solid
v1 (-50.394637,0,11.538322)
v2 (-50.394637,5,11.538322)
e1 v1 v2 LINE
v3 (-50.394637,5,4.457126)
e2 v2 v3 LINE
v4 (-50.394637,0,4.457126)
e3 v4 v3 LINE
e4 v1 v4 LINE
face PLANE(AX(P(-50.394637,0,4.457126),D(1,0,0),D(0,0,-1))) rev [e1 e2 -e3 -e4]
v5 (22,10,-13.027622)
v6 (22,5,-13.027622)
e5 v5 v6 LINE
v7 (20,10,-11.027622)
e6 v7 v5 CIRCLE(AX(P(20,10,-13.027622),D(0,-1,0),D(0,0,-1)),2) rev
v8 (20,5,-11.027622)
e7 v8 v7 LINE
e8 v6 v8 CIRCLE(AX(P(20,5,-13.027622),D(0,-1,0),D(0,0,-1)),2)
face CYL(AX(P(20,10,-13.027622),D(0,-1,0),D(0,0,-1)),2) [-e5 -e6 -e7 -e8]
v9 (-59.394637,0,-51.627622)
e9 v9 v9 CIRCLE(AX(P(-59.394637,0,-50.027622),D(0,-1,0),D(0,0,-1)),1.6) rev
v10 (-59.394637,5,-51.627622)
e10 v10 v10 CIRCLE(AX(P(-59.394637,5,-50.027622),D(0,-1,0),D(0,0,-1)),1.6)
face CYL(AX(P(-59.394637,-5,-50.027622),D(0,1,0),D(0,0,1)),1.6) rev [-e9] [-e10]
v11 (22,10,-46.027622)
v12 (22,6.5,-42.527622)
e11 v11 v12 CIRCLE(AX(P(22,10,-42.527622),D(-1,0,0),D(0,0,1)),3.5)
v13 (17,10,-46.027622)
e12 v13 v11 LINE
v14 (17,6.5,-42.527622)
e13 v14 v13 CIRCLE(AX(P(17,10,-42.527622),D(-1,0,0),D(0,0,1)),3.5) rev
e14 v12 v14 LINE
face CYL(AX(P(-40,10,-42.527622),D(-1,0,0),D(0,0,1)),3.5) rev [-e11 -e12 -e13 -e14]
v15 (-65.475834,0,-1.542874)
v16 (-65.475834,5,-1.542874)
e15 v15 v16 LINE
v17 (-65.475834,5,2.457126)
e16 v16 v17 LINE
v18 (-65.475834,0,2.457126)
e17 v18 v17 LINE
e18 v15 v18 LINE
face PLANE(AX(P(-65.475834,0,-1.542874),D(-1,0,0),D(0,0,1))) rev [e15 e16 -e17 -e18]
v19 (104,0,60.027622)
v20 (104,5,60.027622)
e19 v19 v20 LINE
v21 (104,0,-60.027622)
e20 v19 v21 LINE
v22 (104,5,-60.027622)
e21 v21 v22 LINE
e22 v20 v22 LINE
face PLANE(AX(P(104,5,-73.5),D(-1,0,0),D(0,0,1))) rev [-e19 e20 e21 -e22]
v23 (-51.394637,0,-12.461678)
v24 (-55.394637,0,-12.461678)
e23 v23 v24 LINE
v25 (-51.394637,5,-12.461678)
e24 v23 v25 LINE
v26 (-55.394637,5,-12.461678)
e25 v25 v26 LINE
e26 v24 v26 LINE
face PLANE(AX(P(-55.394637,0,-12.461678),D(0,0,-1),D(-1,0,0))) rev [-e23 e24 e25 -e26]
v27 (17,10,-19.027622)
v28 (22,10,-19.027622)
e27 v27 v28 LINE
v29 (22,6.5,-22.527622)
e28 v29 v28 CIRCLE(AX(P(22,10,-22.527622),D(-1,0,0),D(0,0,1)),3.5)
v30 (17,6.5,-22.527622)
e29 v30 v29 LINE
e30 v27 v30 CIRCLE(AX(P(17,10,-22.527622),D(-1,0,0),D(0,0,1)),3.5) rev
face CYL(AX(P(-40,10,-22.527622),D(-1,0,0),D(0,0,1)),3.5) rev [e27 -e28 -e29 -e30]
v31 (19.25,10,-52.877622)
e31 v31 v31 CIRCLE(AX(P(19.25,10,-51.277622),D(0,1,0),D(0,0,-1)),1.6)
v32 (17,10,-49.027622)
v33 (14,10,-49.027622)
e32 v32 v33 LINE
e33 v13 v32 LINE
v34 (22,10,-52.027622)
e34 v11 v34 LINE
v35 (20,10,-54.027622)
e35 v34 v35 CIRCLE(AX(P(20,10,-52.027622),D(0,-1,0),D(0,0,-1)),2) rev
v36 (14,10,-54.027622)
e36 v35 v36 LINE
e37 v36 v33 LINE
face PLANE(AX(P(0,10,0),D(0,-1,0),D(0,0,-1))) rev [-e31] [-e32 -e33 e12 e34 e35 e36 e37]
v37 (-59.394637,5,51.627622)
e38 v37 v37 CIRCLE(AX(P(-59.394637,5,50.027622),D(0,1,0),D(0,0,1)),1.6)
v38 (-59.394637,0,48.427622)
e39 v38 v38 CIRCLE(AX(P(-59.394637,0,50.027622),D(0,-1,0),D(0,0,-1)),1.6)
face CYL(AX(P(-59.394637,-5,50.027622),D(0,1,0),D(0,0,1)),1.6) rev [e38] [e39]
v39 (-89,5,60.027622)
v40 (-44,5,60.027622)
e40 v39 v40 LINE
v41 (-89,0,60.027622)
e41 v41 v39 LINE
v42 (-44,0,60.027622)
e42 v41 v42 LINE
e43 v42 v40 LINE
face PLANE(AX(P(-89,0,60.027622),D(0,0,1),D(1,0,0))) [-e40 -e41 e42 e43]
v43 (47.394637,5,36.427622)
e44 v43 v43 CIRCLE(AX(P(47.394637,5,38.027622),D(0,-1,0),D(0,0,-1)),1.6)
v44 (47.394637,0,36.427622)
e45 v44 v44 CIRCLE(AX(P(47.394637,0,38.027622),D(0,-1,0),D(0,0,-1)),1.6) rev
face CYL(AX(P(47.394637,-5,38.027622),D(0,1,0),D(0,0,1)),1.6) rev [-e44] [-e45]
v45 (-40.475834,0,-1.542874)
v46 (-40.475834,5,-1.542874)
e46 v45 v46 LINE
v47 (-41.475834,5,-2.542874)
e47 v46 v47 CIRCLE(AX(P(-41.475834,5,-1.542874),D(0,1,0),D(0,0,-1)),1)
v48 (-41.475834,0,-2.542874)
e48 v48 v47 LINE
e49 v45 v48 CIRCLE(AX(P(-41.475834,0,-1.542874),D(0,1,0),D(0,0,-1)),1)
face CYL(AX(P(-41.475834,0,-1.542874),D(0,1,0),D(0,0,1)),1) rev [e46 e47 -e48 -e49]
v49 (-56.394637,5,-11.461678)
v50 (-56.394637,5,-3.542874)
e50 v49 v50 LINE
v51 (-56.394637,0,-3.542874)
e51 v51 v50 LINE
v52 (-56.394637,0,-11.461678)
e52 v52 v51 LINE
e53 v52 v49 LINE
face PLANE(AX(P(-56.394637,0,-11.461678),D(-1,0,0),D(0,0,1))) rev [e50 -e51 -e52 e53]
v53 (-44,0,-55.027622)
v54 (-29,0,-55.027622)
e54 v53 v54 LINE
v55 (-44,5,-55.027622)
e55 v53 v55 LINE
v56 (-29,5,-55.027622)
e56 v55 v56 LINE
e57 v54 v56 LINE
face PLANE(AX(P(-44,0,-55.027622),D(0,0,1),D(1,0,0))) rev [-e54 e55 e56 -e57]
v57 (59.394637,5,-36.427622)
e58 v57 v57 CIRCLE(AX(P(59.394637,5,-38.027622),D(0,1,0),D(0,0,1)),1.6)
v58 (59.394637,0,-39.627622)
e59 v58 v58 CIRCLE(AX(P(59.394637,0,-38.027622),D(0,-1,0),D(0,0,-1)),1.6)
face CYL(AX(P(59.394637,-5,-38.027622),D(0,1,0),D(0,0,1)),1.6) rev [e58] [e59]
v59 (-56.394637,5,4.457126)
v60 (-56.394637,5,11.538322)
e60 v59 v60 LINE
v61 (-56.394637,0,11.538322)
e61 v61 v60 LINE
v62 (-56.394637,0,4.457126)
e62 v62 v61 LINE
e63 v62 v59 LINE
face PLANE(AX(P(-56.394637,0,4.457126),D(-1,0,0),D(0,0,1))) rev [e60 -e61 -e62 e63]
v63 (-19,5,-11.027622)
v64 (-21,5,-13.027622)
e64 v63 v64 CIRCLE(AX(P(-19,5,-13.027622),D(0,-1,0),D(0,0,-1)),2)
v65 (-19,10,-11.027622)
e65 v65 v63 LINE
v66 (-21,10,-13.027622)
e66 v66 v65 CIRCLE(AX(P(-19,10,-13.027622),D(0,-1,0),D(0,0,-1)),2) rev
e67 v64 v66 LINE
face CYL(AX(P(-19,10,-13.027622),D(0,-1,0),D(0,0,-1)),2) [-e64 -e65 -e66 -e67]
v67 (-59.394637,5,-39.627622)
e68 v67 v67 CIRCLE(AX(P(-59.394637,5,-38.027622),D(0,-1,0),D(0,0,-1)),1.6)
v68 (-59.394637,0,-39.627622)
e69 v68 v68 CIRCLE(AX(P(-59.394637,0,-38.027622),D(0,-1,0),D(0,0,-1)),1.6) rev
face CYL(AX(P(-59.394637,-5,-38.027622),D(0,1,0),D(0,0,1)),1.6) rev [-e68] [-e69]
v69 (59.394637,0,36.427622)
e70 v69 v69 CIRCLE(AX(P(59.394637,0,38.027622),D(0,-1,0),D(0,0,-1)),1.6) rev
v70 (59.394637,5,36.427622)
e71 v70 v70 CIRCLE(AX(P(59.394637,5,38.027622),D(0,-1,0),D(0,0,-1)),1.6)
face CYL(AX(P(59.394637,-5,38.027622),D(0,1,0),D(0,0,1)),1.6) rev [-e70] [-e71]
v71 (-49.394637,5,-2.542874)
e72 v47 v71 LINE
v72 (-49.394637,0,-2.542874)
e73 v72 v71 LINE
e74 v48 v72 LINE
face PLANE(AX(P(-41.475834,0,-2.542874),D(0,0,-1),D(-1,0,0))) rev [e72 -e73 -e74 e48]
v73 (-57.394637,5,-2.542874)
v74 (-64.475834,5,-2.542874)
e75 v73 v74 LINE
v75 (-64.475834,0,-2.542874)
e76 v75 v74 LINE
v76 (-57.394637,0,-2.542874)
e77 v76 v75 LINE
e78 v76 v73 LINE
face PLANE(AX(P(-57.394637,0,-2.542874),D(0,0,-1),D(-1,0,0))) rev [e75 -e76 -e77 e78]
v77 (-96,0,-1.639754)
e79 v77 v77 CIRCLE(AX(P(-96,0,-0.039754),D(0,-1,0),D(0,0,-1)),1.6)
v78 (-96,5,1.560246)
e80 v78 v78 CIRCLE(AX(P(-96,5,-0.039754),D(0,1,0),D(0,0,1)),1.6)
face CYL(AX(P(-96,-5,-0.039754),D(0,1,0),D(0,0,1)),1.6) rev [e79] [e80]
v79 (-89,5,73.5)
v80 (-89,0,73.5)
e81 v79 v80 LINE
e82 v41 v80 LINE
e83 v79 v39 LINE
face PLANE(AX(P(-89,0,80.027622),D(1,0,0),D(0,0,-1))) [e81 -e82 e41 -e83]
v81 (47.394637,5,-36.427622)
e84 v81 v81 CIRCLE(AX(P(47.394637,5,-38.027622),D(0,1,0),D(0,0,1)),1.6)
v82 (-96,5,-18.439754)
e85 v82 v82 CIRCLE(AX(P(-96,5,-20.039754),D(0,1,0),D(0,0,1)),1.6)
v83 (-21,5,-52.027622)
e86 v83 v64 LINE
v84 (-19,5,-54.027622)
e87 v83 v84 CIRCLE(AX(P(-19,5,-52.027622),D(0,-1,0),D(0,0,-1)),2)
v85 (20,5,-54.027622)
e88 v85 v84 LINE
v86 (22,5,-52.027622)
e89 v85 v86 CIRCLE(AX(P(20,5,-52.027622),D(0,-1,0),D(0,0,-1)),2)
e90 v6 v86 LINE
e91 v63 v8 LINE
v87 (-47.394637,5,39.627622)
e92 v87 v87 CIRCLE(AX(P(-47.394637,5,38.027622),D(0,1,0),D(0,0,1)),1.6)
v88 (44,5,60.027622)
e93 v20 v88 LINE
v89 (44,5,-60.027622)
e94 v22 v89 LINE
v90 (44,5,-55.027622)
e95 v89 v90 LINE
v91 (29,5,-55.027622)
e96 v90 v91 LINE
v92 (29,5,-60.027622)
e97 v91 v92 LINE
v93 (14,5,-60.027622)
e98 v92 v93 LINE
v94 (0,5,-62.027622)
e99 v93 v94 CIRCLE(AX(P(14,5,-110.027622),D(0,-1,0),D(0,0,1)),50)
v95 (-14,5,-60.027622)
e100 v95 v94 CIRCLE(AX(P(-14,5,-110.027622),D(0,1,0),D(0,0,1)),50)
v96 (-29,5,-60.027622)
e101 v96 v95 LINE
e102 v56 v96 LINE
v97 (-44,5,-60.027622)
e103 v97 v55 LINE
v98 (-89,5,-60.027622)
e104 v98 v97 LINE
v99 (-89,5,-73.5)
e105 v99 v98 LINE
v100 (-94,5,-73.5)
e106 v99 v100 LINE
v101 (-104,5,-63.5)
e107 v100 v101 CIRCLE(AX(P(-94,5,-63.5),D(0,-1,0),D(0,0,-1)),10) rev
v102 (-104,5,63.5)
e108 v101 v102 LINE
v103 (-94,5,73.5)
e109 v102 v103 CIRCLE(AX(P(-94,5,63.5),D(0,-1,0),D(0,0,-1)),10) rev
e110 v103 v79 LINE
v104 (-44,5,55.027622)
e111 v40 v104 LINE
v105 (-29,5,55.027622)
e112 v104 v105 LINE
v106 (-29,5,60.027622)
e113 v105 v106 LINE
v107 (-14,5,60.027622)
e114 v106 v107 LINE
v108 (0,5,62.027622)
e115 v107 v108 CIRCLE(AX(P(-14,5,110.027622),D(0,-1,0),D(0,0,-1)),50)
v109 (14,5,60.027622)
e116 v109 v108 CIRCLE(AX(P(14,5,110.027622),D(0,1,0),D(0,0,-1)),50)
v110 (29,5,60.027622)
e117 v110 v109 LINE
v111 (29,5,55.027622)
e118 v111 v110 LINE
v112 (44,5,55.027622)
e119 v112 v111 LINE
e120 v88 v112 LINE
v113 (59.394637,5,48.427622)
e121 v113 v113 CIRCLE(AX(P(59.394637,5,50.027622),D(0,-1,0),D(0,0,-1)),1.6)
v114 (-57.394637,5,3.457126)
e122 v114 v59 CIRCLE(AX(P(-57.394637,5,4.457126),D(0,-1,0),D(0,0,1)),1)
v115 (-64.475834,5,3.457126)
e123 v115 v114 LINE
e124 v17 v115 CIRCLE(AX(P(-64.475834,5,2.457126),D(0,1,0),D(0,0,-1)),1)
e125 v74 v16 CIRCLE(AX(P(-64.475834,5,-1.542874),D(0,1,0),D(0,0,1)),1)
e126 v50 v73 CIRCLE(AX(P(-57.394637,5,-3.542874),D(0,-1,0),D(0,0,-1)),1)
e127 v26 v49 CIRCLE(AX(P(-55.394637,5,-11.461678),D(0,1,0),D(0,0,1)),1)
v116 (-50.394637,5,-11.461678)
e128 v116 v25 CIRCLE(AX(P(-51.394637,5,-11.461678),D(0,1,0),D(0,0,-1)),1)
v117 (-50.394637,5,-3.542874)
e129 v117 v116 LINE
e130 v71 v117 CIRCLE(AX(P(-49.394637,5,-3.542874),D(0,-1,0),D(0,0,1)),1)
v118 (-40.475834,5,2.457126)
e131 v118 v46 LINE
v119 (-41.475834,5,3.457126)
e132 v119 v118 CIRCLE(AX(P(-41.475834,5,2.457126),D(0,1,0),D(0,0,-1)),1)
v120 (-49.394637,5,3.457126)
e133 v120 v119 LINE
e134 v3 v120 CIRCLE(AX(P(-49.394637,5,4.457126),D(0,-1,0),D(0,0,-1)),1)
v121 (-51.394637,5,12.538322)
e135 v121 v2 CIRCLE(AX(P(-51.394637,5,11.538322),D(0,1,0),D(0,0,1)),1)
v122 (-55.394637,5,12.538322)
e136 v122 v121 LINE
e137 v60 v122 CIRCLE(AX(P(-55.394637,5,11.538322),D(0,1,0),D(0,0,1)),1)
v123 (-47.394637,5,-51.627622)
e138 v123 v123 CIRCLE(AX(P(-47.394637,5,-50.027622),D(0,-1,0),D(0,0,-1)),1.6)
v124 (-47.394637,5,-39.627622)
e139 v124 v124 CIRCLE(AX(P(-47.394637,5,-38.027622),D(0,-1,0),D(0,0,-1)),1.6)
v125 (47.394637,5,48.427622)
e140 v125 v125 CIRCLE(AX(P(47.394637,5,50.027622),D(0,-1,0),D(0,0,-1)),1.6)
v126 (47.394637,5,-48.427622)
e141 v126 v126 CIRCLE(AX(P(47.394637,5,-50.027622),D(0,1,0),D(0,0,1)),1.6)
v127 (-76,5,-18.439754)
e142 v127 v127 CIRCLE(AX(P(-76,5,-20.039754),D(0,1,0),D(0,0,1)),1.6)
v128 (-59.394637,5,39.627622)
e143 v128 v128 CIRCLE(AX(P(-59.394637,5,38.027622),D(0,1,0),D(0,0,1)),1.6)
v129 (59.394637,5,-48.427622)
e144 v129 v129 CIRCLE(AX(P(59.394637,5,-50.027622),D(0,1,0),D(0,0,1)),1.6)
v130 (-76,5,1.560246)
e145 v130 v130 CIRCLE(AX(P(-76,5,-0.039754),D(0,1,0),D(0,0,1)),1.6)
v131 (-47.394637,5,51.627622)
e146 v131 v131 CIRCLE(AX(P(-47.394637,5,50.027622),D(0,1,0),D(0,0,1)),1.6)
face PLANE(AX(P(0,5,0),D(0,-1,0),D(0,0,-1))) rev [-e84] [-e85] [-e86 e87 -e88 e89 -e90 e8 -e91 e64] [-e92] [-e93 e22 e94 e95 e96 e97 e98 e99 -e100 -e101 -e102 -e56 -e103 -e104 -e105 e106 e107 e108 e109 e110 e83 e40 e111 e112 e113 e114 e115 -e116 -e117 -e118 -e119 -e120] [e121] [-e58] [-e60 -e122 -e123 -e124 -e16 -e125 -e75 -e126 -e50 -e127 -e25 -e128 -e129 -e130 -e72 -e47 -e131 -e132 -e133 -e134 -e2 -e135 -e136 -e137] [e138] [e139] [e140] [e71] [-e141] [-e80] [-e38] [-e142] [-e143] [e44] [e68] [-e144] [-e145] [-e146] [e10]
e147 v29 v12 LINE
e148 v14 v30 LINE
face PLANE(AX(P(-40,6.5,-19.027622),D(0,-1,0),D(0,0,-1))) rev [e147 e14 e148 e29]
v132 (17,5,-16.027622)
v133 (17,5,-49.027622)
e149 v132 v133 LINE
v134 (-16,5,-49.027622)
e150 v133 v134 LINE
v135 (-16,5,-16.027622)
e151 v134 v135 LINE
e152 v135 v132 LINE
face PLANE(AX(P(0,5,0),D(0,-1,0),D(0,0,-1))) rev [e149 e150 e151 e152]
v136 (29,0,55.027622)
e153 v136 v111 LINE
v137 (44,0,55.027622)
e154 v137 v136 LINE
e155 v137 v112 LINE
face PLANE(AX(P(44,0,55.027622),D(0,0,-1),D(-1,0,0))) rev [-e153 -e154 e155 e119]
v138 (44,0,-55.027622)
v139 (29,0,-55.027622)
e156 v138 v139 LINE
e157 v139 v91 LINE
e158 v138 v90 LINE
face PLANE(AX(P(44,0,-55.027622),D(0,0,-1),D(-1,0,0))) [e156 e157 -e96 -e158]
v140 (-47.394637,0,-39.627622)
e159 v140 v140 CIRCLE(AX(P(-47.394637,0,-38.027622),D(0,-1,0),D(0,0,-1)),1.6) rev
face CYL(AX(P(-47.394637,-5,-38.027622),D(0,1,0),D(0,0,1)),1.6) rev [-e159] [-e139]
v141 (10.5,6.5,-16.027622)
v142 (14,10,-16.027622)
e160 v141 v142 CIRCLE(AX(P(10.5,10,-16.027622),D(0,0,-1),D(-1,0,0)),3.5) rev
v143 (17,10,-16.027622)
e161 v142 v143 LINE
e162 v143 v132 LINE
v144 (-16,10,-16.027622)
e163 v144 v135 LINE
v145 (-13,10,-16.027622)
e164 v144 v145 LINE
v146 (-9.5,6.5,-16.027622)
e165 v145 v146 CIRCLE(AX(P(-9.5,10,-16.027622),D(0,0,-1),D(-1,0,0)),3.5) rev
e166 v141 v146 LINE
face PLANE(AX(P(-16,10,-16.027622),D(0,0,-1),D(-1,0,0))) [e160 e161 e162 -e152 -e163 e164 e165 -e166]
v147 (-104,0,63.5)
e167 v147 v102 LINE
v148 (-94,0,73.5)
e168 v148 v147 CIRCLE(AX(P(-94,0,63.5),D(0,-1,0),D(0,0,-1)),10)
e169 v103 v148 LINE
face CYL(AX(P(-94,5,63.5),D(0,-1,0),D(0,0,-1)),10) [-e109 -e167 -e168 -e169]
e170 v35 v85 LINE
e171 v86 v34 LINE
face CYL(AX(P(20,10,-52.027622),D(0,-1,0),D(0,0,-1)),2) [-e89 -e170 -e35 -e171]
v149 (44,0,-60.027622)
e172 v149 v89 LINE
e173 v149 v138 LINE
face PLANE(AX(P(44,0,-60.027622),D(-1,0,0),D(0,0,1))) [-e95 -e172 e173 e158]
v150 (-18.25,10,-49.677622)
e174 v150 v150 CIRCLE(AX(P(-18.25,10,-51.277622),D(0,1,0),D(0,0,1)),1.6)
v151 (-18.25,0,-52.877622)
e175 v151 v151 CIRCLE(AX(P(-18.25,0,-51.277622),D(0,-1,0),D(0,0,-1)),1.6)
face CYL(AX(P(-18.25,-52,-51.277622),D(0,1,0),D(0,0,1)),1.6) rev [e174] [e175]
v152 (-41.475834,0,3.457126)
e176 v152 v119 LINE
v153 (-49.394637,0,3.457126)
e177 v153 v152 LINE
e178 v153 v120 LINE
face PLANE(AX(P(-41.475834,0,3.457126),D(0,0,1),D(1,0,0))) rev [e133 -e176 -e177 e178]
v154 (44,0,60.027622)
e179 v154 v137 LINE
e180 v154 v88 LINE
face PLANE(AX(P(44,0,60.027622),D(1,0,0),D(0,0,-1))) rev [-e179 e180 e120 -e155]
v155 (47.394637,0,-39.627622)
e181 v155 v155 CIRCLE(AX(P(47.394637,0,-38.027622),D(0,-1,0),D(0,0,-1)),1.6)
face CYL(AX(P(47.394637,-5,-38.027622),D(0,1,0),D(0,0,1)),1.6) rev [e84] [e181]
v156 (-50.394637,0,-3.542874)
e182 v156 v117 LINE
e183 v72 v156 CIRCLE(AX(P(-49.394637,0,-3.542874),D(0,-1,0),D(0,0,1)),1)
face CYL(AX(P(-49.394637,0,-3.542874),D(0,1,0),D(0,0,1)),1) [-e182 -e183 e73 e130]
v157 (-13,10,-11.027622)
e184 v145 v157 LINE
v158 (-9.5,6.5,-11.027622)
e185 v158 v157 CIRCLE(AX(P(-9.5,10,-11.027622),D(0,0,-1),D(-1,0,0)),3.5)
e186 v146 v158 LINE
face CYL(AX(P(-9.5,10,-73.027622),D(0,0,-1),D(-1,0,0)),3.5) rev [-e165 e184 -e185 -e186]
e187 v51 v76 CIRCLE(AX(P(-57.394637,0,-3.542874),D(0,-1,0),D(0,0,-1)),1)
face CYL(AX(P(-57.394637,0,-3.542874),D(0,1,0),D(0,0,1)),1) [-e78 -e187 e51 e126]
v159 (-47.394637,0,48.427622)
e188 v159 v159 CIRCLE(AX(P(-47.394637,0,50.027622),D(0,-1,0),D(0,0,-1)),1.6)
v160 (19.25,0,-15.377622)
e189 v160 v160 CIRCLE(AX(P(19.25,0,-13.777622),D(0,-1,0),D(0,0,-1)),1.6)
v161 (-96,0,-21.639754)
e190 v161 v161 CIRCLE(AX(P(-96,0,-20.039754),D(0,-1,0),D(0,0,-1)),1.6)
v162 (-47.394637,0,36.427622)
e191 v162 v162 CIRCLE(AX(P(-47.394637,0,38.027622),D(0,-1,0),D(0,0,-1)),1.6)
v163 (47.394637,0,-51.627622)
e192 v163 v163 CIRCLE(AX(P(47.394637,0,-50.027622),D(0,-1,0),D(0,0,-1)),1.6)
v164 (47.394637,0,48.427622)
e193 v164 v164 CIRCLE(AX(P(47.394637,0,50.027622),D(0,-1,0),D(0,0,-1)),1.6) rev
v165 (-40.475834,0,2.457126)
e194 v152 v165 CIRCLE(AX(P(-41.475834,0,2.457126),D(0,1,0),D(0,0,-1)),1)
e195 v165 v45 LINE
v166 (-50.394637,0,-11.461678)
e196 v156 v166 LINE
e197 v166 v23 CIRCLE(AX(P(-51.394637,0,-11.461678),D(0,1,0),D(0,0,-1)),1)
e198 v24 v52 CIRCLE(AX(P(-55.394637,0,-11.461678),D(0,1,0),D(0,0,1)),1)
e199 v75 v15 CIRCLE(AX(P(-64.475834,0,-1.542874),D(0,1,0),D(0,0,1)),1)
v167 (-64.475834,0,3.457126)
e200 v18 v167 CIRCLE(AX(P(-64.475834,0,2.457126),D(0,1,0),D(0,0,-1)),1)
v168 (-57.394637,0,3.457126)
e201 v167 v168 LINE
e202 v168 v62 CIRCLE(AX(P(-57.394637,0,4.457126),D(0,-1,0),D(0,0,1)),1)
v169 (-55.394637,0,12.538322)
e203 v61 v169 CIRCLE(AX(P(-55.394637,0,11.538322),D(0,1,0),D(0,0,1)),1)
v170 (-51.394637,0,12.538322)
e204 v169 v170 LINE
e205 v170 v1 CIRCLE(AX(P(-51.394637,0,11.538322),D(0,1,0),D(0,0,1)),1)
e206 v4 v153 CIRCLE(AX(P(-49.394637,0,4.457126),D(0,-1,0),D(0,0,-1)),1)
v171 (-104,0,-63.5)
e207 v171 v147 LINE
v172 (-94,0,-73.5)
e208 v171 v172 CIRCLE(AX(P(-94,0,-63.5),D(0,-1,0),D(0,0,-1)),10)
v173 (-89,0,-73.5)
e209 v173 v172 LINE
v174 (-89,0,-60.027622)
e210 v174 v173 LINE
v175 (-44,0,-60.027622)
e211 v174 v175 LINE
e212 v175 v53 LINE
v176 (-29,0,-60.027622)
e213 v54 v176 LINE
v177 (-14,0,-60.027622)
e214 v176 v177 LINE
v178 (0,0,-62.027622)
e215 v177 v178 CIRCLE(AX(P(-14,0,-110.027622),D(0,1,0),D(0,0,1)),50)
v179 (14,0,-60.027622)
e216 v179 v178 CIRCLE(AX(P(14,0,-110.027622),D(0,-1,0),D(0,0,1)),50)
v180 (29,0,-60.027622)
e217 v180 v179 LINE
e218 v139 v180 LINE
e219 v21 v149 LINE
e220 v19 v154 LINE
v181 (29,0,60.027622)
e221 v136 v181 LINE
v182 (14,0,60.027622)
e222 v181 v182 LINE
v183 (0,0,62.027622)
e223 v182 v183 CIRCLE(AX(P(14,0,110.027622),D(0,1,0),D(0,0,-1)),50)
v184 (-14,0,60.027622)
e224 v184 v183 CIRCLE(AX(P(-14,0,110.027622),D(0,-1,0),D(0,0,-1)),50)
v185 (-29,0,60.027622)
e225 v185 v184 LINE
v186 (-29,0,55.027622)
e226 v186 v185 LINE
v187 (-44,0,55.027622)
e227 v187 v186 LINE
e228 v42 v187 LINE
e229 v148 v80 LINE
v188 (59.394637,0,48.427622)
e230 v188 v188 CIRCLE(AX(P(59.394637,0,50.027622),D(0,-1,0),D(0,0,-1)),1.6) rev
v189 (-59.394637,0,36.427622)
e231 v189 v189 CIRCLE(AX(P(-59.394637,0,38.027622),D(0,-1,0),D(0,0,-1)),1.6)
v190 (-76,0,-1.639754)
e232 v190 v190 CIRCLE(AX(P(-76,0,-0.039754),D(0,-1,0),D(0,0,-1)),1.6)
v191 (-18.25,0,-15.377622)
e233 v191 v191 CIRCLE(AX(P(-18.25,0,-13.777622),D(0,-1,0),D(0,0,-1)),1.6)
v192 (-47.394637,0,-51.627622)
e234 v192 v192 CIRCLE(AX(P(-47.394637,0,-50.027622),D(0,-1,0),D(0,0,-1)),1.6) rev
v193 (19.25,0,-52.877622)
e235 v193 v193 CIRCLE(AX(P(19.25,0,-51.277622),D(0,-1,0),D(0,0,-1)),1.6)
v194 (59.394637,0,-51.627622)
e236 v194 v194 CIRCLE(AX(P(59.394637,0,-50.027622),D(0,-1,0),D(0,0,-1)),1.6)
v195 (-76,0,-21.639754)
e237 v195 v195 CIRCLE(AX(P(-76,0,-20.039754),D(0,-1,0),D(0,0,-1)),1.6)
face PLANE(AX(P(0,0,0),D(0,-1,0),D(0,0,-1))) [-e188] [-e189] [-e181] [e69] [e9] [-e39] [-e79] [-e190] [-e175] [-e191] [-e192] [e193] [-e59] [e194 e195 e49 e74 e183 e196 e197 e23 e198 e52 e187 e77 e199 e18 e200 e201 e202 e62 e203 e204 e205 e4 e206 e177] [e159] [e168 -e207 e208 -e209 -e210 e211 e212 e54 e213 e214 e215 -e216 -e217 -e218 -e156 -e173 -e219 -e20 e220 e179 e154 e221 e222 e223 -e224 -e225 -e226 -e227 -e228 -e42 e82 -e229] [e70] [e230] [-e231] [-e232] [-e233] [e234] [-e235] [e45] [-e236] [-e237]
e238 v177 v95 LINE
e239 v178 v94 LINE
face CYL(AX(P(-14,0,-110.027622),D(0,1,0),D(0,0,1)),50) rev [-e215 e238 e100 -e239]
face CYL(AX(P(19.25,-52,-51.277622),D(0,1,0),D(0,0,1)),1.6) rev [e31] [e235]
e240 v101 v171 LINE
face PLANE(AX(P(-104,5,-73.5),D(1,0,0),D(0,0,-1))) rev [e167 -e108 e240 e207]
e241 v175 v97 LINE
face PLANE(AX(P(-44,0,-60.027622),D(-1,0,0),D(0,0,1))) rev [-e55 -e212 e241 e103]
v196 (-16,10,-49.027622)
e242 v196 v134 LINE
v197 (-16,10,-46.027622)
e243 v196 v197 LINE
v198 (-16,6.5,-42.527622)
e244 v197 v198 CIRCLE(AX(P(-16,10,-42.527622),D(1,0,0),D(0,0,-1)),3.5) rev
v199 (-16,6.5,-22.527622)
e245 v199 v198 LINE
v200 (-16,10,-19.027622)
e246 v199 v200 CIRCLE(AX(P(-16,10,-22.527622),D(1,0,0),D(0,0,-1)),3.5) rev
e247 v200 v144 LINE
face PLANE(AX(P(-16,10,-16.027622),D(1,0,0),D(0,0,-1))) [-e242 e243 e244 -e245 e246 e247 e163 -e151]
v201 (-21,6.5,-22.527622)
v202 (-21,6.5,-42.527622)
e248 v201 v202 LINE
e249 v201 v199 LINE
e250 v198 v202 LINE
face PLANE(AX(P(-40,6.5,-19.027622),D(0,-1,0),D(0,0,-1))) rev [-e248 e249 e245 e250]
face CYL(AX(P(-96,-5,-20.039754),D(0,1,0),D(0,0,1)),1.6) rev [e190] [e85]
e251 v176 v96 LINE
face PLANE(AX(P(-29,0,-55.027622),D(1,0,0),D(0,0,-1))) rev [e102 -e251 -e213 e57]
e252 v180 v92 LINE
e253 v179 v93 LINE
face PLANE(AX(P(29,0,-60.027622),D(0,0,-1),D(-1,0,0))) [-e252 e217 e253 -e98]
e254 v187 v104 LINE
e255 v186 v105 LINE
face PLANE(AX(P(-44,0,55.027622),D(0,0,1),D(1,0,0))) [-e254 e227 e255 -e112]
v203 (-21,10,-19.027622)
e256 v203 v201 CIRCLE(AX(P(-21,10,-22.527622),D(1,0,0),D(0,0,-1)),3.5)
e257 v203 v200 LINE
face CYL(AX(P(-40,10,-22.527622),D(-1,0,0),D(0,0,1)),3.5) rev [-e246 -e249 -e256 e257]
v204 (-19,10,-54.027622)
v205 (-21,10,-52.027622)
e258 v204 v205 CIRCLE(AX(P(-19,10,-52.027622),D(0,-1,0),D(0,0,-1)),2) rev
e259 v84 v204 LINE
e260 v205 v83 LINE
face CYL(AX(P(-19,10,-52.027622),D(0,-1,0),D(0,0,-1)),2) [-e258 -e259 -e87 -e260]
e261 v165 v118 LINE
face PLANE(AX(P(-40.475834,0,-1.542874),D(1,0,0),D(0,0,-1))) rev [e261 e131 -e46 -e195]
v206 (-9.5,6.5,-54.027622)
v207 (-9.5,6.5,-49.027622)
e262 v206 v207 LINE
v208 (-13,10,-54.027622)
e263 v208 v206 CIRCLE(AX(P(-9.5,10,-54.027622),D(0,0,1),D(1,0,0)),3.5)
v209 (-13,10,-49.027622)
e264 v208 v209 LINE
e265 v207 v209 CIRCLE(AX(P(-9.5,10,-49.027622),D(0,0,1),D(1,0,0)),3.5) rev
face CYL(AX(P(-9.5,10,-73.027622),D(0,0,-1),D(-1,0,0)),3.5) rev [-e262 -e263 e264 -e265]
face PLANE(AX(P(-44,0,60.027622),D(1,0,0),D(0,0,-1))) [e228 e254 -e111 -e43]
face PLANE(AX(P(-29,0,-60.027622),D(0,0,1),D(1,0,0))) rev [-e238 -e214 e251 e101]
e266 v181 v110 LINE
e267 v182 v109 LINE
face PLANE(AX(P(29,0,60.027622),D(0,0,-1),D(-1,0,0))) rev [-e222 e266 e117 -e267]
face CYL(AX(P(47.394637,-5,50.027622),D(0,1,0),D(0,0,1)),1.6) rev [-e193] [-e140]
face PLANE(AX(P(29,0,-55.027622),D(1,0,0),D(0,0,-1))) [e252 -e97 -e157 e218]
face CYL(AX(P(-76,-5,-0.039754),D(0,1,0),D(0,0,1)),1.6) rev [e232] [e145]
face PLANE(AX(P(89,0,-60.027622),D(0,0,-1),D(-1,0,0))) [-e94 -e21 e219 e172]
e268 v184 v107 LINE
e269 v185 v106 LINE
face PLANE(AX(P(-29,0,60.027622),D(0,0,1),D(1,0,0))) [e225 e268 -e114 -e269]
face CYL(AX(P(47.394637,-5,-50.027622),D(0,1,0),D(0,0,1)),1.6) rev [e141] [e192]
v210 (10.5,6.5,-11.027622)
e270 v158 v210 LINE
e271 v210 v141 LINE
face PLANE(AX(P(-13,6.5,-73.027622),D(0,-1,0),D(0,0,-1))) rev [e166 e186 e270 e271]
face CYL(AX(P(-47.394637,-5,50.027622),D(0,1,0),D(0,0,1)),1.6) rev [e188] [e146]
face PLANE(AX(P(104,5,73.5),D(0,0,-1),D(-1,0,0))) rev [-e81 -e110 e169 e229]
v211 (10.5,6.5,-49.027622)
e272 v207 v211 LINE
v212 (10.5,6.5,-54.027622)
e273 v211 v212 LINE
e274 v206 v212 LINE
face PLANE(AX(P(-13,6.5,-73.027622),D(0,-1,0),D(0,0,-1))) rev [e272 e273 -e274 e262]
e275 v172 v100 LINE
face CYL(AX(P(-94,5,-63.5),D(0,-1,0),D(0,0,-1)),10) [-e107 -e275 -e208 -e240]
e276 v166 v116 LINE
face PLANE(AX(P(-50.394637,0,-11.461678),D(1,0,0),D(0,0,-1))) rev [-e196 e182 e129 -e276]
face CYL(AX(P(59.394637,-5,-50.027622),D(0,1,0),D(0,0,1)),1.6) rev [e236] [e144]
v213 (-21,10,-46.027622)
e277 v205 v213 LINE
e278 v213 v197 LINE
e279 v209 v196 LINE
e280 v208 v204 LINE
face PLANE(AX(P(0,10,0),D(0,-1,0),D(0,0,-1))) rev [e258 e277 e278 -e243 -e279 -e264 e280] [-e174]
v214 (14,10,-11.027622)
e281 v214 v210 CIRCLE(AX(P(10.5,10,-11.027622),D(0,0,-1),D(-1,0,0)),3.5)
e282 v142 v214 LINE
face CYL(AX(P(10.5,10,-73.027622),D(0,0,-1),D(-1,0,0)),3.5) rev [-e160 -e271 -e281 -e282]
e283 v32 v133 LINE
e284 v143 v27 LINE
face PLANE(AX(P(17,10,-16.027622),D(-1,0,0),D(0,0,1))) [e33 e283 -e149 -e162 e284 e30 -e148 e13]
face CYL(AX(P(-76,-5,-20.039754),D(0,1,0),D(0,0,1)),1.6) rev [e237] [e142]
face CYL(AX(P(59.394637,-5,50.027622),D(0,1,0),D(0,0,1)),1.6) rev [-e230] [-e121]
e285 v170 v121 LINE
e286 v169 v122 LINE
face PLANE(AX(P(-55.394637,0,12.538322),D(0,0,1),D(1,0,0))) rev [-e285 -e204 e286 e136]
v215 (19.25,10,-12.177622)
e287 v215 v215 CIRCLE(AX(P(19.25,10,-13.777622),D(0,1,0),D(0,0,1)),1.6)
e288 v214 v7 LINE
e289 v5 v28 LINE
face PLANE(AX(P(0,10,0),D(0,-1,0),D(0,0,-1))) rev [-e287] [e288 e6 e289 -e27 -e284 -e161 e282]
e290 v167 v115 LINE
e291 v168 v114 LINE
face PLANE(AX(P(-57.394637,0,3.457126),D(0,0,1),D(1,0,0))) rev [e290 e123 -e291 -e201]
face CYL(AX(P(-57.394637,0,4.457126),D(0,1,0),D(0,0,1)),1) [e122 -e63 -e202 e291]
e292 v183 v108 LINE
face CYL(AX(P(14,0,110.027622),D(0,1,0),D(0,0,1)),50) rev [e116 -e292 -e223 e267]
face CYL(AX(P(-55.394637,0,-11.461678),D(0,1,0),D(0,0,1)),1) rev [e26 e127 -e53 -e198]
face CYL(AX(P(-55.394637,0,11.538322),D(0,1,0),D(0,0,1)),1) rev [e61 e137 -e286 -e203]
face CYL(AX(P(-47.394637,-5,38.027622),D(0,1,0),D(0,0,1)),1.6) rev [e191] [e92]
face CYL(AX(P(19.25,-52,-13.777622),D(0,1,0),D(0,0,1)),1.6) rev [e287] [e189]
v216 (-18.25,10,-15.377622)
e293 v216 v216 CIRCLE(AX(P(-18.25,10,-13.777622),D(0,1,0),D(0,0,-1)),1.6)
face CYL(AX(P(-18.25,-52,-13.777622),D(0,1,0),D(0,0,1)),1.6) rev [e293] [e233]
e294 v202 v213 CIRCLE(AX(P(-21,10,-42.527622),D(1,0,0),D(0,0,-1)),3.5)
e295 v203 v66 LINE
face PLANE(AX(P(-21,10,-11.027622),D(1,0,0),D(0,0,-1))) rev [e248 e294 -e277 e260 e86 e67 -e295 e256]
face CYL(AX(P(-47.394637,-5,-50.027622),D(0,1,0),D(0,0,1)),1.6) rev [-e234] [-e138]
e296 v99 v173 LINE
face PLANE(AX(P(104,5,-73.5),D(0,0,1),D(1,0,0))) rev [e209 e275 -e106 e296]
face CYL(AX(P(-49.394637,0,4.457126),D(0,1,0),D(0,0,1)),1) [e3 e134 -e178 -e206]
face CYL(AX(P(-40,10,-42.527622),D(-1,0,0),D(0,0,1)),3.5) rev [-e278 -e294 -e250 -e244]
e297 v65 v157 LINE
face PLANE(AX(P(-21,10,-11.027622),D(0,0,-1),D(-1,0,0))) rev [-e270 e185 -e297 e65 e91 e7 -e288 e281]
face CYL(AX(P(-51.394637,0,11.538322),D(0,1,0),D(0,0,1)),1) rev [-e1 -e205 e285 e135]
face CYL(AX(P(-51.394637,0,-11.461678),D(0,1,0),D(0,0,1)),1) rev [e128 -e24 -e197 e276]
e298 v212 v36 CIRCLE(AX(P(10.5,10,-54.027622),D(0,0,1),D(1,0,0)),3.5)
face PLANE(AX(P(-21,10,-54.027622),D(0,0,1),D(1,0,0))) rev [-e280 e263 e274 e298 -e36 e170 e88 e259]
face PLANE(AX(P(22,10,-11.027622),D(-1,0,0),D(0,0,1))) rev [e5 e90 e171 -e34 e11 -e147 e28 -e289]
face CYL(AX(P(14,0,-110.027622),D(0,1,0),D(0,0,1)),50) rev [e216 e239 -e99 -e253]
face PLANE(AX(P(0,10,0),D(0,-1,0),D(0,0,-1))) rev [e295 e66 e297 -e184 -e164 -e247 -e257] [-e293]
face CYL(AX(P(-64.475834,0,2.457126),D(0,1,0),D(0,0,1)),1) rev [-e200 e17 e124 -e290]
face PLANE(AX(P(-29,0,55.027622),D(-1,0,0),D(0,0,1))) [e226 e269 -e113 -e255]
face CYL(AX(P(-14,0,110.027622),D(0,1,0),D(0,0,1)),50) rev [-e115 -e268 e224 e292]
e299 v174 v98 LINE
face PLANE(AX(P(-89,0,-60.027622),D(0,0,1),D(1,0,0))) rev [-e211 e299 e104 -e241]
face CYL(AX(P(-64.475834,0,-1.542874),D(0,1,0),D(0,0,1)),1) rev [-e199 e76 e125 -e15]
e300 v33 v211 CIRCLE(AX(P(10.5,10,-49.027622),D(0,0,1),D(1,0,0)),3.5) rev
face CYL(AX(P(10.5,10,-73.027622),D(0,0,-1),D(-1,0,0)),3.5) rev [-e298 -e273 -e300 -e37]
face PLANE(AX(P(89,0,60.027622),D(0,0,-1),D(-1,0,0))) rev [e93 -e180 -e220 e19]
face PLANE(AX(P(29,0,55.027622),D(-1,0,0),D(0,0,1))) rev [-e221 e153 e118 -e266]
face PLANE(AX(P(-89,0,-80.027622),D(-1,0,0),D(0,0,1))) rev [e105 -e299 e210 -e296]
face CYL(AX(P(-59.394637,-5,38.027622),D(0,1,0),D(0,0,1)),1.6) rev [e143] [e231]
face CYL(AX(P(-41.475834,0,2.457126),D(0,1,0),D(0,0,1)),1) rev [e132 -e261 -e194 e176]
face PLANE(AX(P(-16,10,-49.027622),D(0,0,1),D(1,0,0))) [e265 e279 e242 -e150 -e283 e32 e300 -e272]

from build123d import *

# Parameters (mm, degrees)
SKETCH1_W            = 208
SKETCH1_H            = 147
BOSS_EXTRUDE1_DEPTH  = 5
CUT_EXTRUDE2_DEPTH   = 128.449009412
MIRROR2_COPY_1_DEPTH = 128.449009412
FILLET1_R            = 10
CUT_EXTRUDE3_DEPTH   = 128.449009412
SKETCH5_R            = 1.6
CUT_EXTRUDE4_DEPTH   = 10
SKETCH8_R            = 1.6
CUT_EXTRUDE5_DEPTH   = 10
SKETCH9_W            = 43
SKETCH9_H            = 43
SKETCH9_W_2          = 33
SKETCH9_H_2          = 33
BOSS_EXTRUDE3_DEPTH  = 5
SKETCH10_W           = 27
SKETCH10_H           = 3.5
CUT_EXTRUDE6_DEPTH   = 62
SKETCH11_W           = 27
SKETCH11_H           = 3.5
CUT_EXTRUDE7_DEPTH   = 62
FILLET4_R            = 3.5
SKETCH12_R           = 1.6
CUT_EXTRUDE8_DEPTH   = 62
FILLET5_R            = 3.5
FILLET6_R            = 2
SKETCH14_W           = 15
SKETCH14_H           = 13.472377551
CUT_EXTRUDE10_DEPTH  = 10


with BuildPart() as part:
    # Sketch1 → Boss-Extrude1 (new body)
    with BuildSketch(Plane(origin=(0, 0, 0), x_dir=(1, 0, 0), z_dir=(0, 1, 0))):
        Rectangle(SKETCH1_W, SKETCH1_H)
    extrude(amount=BOSS_EXTRUDE1_DEPTH)

    # Sketch2 → Cut-Extrude2 (cut, through all)
    with BuildSketch(Plane(origin=(0, 5, 0), x_dir=(1, 0, 0), z_dir=(0, 1, 0))):
        with BuildLine():
            Line((-89, 80.027622449), (-89, 60.027622449))
            Line((-89, 60.027622449), (-44, 60.027622449))
            Line((-44, 60.027622449), (-44, 55.027622449))
            Line((-44, 55.027622449), (-29, 55.027622449))
            Line((-29, 55.027622449), (-29, 60.027622449))
            Line((-29, 60.027622449), (-14, 60.027622449))
            ThreePointArc((-14, 60.027622449), (-6.928932188, 60.530147766), (0, 62.027622449))
            Line((0, 62.027622449), (0, 82.027622449))
            Line((0, 82.027622449), (-89, 82.027622449))
            Line((-89, 82.027622449), (-89, 80.027622449))
        make_face()
    cut_extrude2 = extrude(amount=-CUT_EXTRUDE2_DEPTH, mode=Mode.SUBTRACT)

    # Mirror1: Cut-Extrude2 across plane
    add(cut_extrude2.mirror(Plane.XY), mode=Mode.SUBTRACT)

    # Mirror2: Cut-Extrude2 across plane
    add(cut_extrude2.mirror(Plane(origin=(0, 0, 0), x_dir=(0, 0, 1), z_dir=(1, 0, 0))), mode=Mode.SUBTRACT)

    # Mirror2 copy 1 sketch → Mirror2 copy 1 (cut, through all)
    with BuildSketch(Plane(origin=(0, 5, 0), x_dir=(-1, 0, 0), z_dir=(0, 1, 0))):
        with BuildLine():
            Line((-89, 80.027622449), (-89, 60.027622449))
            Line((-89, 60.027622449), (-44, 60.027622449))
            Line((-44, 60.027622449), (-44, 55.027622449))
            Line((-44, 55.027622449), (-29, 55.027622449))
            Line((-29, 55.027622449), (-29, 60.027622449))
            Line((-29, 60.027622449), (-14, 60.027622449))
            ThreePointArc((-14, 60.027622449), (-6.928932188, 60.530147766), (0, 62.027622449))
            Line((0, 62.027622449), (0, 82.027622449))
            Line((0, 82.027622449), (-89, 82.027622449))
            Line((-89, 82.027622449), (-89, 80.027622449))
        make_face()
    extrude(amount=-MIRROR2_COPY_1_DEPTH, mode=Mode.SUBTRACT)

    # Fillet1
    fillet1_edges = [part.edges().sort_by_distance(p)[0] for p in [
        (-104, 2.5, -73.5),
        (104, 2.5, -73.5),
        (104, 2.5, 73.5),
        (-104, 2.5, 73.5),
    ]]
    fillet(fillet1_edges, radius=FILLET1_R)

    # Sketch3 → Cut-Extrude3 (cut, through all)
    with BuildSketch(Plane(origin=(0, 5, 0), x_dir=(1, 0, 0), z_dir=(0, 1, 0))):
        with BuildLine():
            Line((-56.39463696, -4.457125787), (-56.39463696, -11.538322368))
            ThreePointArc((-56.39463696, -11.538322368), (-56.101743741, -12.245429149), (-55.39463696, -12.538322368))
            Line((-55.39463696, -12.538322368), (-51.39463696, -12.538322368))
            ThreePointArc((-51.39463696, -12.538322368), (-50.687530178, -12.245429149), (-50.39463696, -11.538322368))
            Line((-50.39463696, -11.538322368), (-50.39463696, -4.457125787))
            ThreePointArc((-50.39463696, -4.457125787), (-50.101743741, -3.750019006), (-49.39463696, -3.457125787))
            Line((-49.39463696, -3.457125787), (-41.475833541, -3.457125787))
            ThreePointArc((-41.475833541, -3.457125787), (-40.76872676, -3.164232568), (-40.475833541, -2.457125787))
            Line((-40.475833541, -2.457125787), (-40.475833541, 1.542874213))
            ThreePointArc((-40.475833541, 1.542874213), (-40.76872676, 2.249980994), (-41.475833541, 2.542874213))
            Line((-41.475833541, 2.542874213), (-49.39463696, 2.542874213))
            ThreePointArc((-49.39463696, 2.542874213), (-50.101743741, 2.835767432), (-50.39463696, 3.542874213))
            Line((-50.39463696, 3.542874213), (-50.39463696, 11.461677632))
            ThreePointArc((-50.39463696, 11.461677632), (-50.687530178, 12.168784413), (-51.39463696, 12.461677632))
            Line((-51.39463696, 12.461677632), (-55.39463696, 12.461677632))
            ThreePointArc((-55.39463696, 12.461677632), (-56.101743741, 12.168784413), (-56.39463696, 11.461677632))
            Line((-56.39463696, 11.461677632), (-56.39463696, 3.542874213))
            ThreePointArc((-56.39463696, 3.542874213), (-56.687530178, 2.835767432), (-57.39463696, 2.542874213))
            Line((-57.39463696, 2.542874213), (-64.475833541, 2.542874213))
            ThreePointArc((-64.475833541, 2.542874213), (-65.182940322, 2.249980994), (-65.475833541, 1.542874213))
            Line((-65.475833541, 1.542874213), (-65.475833541, -2.457125787))
            ThreePointArc((-65.475833541, -2.457125787), (-65.182940322, -3.164232568), (-64.475833541, -3.457125787))
            Line((-64.475833541, -3.457125787), (-57.39463696, -3.457125787))
            ThreePointArc((-57.39463696, -3.457125787), (-56.687530178, -3.750019006), (-56.39463696, -4.457125787))
        make_face()
    extrude(amount=-CUT_EXTRUDE3_DEPTH, mode=Mode.SUBTRACT)

    # Sketch5 → Cut-Extrude4 (cut)
    with BuildSketch(Plane(origin=(0, 5, 0), x_dir=(1, 0, 0), z_dir=(0, 1, 0))):
        with Locations(Location((-96, 20.039754171, 0), (0, 0, 270))):
            Circle(SKETCH5_R)
        with Locations(Location((-76, 20.039754171, 0), (0, 0, 270))):
            Circle(SKETCH5_R)
        with Locations(Location((-76, 0.039754171, 0), (0, 0, 270))):
            Circle(SKETCH5_R)
        with Locations(Location((-96, 0.039754171, 0), (0, 0, 270))):
            Circle(SKETCH5_R)
    extrude(amount=-CUT_EXTRUDE4_DEPTH, mode=Mode.SUBTRACT)

    # Sketch8 → Cut-Extrude5 (cut)
    with BuildSketch(Plane(origin=(0, 5, 0), x_dir=(1, 0, 0), z_dir=(0, 1, 0))):
        with Locations(Location((-59.39463696, -50.027622449, 0), (0, 0, 270))):
            Circle(SKETCH8_R)
        with Locations(Location((-47.39463696, -50.027622449, 0), (0, 0, 270))):
            Circle(SKETCH8_R)
        with Locations(Location((-47.39463696, -38.027622449, 0), (0, 0, 270))):
            Circle(SKETCH8_R)
        with Locations(Location((-59.39463696, -38.027622449, 0), (0, 0, 270))):
            Circle(SKETCH8_R)
        with Locations(Location((-59.39463696, 50.027622449, 0), (0, 0, 90))):
            Circle(SKETCH8_R)
        with Locations(Location((-47.39463696, 50.027622449, 0), (0, 0, 90))):
            Circle(SKETCH8_R)
        with Locations(Location((-47.39463696, 38.027622449, 0), (0, 0, 90))):
            Circle(SKETCH8_R)
        with Locations(Location((-59.39463696, 38.027622449, 0), (0, 0, 90))):
            Circle(SKETCH8_R)
        with Locations(Location((59.39463696, 50.027622449, 0), (0, 0, 270))):
            Circle(SKETCH8_R)
        with Locations(Location((47.39463696, 50.027622449, 0), (0, 0, 270))):
            Circle(SKETCH8_R)
        with Locations(Location((47.39463696, 38.027622449, 0), (0, 0, 270))):
            Circle(SKETCH8_R)
        with Locations(Location((59.39463696, 38.027622449, 0), (0, 0, 270))):
            Circle(SKETCH8_R)
        with Locations(Location((47.39463696, -50.027622449, 0), (0, 0, 90))):
            Circle(SKETCH8_R)
        with Locations(Location((47.39463696, -38.027622449, 0), (0, 0, 90))):
            Circle(SKETCH8_R)
        with Locations(Location((59.39463696, -50.027622449, 0), (0, 0, 90))):
            Circle(SKETCH8_R)
        with Locations(Location((59.39463696, -38.027622449, 0), (0, 0, 90))):
            Circle(SKETCH8_R)
    extrude(amount=-CUT_EXTRUDE5_DEPTH, mode=Mode.SUBTRACT)

    # Sketch9 → Boss-Extrude3 (add)
    with BuildSketch(Plane(origin=(0, 5, 0), x_dir=(1, 0, 0), z_dir=(0, 1, 0))):
        with Locations((0.5, 32.527622449)):
            Rectangle(SKETCH9_W, SKETCH9_H)
        with Locations((0.5, 32.527622449)):
            Rectangle(SKETCH9_W_2, SKETCH9_H_2, mode=Mode.SUBTRACT)
    extrude(amount=BOSS_EXTRUDE3_DEPTH)

    # Sketch10 → Cut-Extrude6 (cut)
    with BuildSketch(Plane.XY.offset(-11.027622449)):
        with Locations((0.5, 8.25)):
            Rectangle(SKETCH10_W, SKETCH10_H)
    extrude(amount=-CUT_EXTRUDE6_DEPTH, mode=Mode.SUBTRACT)

    # Sketch11 → Cut-Extrude7 (cut)
    with BuildSketch(Plane(origin=(22, 0, 0), x_dir=(0, 0, -1), z_dir=(1, 0, 0))):
        with Locations((32.527622449, 8.25)):
            Rectangle(SKETCH11_W, SKETCH11_H)
    extrude(amount=-CUT_EXTRUDE7_DEPTH, mode=Mode.SUBTRACT)

    # Fillet4
    fillet4_edges = [part.edges().sort_by_distance(p)[0] for p in [
        (19.5, 6.5, -19.027622449),
        (19.5, 6.5, -46.027622449),
        (14, 6.5, -51.527622449),
        (-18.5, 6.5, -19.027622449),
        (-18.5, 6.5, -46.027622449),
        (-13, 6.5, -13.527622449),
    ]]
    fillet(fillet4_edges, radius=FILLET4_R - 0.0001)  # a hair under: the kernel refuses the full size

    # Sketch12 → Cut-Extrude8 (cut)
    with BuildSketch(Plane(origin=(0, 10, 0), x_dir=(1, 0, 0), z_dir=(0, 1, 0))):
        with Locations(Location((-18.25, 51.277622449, 0), (0, 0, 270))):
            Circle(SKETCH12_R)
        with Locations(Location((19.25, 51.277622449, 0), (0, 0, 90))):
            Circle(SKETCH12_R)
        with Locations(Location((19.25, 13.777622449, 0), (0, 0, 270))):
            Circle(SKETCH12_R)
        with Locations(Location((-18.25, 13.777622449, 0), (0, 0, 90))):
            Circle(SKETCH12_R)
    extrude(amount=-CUT_EXTRUDE8_DEPTH, mode=Mode.SUBTRACT)

    # Fillet5
    fillet5_edges = [part.edges().sort_by_distance(p)[0] for p in [
        (14, 6.5, -13.527622449),
        (-13, 6.5, -51.527622449),
    ]]
    fillet(fillet5_edges, radius=FILLET5_R - 0.0001)  # a hair under: the kernel refuses the full size

    # Fillet6
    fillet6_edges = [part.edges().sort_by_distance(p)[0] for p in [
        (-21, 7.5, -54.027622449),
        (-21, 7.5, -11.027622449),
        (22, 7.5, -11.027622449),
        (22, 7.5, -54.027622449),
    ]]
    fillet(fillet6_edges, radius=FILLET6_R)

    # Sketch14 → Cut-Extrude10 (cut)
    with BuildSketch(Plane(origin=(0, 5, 0), x_dir=(1, 0, 0), z_dir=(0, 1, 0))):
        with Locations((96.5, 66.763811225)):
            Rectangle(SKETCH14_W, SKETCH14_H)
        with Locations((96.5, -66.763811225)):
            Rectangle(SKETCH14_W, SKETCH14_H)
    extrude(amount=-CUT_EXTRUDE10_DEPTH, mode=Mode.SUBTRACT)


solid = part.part
